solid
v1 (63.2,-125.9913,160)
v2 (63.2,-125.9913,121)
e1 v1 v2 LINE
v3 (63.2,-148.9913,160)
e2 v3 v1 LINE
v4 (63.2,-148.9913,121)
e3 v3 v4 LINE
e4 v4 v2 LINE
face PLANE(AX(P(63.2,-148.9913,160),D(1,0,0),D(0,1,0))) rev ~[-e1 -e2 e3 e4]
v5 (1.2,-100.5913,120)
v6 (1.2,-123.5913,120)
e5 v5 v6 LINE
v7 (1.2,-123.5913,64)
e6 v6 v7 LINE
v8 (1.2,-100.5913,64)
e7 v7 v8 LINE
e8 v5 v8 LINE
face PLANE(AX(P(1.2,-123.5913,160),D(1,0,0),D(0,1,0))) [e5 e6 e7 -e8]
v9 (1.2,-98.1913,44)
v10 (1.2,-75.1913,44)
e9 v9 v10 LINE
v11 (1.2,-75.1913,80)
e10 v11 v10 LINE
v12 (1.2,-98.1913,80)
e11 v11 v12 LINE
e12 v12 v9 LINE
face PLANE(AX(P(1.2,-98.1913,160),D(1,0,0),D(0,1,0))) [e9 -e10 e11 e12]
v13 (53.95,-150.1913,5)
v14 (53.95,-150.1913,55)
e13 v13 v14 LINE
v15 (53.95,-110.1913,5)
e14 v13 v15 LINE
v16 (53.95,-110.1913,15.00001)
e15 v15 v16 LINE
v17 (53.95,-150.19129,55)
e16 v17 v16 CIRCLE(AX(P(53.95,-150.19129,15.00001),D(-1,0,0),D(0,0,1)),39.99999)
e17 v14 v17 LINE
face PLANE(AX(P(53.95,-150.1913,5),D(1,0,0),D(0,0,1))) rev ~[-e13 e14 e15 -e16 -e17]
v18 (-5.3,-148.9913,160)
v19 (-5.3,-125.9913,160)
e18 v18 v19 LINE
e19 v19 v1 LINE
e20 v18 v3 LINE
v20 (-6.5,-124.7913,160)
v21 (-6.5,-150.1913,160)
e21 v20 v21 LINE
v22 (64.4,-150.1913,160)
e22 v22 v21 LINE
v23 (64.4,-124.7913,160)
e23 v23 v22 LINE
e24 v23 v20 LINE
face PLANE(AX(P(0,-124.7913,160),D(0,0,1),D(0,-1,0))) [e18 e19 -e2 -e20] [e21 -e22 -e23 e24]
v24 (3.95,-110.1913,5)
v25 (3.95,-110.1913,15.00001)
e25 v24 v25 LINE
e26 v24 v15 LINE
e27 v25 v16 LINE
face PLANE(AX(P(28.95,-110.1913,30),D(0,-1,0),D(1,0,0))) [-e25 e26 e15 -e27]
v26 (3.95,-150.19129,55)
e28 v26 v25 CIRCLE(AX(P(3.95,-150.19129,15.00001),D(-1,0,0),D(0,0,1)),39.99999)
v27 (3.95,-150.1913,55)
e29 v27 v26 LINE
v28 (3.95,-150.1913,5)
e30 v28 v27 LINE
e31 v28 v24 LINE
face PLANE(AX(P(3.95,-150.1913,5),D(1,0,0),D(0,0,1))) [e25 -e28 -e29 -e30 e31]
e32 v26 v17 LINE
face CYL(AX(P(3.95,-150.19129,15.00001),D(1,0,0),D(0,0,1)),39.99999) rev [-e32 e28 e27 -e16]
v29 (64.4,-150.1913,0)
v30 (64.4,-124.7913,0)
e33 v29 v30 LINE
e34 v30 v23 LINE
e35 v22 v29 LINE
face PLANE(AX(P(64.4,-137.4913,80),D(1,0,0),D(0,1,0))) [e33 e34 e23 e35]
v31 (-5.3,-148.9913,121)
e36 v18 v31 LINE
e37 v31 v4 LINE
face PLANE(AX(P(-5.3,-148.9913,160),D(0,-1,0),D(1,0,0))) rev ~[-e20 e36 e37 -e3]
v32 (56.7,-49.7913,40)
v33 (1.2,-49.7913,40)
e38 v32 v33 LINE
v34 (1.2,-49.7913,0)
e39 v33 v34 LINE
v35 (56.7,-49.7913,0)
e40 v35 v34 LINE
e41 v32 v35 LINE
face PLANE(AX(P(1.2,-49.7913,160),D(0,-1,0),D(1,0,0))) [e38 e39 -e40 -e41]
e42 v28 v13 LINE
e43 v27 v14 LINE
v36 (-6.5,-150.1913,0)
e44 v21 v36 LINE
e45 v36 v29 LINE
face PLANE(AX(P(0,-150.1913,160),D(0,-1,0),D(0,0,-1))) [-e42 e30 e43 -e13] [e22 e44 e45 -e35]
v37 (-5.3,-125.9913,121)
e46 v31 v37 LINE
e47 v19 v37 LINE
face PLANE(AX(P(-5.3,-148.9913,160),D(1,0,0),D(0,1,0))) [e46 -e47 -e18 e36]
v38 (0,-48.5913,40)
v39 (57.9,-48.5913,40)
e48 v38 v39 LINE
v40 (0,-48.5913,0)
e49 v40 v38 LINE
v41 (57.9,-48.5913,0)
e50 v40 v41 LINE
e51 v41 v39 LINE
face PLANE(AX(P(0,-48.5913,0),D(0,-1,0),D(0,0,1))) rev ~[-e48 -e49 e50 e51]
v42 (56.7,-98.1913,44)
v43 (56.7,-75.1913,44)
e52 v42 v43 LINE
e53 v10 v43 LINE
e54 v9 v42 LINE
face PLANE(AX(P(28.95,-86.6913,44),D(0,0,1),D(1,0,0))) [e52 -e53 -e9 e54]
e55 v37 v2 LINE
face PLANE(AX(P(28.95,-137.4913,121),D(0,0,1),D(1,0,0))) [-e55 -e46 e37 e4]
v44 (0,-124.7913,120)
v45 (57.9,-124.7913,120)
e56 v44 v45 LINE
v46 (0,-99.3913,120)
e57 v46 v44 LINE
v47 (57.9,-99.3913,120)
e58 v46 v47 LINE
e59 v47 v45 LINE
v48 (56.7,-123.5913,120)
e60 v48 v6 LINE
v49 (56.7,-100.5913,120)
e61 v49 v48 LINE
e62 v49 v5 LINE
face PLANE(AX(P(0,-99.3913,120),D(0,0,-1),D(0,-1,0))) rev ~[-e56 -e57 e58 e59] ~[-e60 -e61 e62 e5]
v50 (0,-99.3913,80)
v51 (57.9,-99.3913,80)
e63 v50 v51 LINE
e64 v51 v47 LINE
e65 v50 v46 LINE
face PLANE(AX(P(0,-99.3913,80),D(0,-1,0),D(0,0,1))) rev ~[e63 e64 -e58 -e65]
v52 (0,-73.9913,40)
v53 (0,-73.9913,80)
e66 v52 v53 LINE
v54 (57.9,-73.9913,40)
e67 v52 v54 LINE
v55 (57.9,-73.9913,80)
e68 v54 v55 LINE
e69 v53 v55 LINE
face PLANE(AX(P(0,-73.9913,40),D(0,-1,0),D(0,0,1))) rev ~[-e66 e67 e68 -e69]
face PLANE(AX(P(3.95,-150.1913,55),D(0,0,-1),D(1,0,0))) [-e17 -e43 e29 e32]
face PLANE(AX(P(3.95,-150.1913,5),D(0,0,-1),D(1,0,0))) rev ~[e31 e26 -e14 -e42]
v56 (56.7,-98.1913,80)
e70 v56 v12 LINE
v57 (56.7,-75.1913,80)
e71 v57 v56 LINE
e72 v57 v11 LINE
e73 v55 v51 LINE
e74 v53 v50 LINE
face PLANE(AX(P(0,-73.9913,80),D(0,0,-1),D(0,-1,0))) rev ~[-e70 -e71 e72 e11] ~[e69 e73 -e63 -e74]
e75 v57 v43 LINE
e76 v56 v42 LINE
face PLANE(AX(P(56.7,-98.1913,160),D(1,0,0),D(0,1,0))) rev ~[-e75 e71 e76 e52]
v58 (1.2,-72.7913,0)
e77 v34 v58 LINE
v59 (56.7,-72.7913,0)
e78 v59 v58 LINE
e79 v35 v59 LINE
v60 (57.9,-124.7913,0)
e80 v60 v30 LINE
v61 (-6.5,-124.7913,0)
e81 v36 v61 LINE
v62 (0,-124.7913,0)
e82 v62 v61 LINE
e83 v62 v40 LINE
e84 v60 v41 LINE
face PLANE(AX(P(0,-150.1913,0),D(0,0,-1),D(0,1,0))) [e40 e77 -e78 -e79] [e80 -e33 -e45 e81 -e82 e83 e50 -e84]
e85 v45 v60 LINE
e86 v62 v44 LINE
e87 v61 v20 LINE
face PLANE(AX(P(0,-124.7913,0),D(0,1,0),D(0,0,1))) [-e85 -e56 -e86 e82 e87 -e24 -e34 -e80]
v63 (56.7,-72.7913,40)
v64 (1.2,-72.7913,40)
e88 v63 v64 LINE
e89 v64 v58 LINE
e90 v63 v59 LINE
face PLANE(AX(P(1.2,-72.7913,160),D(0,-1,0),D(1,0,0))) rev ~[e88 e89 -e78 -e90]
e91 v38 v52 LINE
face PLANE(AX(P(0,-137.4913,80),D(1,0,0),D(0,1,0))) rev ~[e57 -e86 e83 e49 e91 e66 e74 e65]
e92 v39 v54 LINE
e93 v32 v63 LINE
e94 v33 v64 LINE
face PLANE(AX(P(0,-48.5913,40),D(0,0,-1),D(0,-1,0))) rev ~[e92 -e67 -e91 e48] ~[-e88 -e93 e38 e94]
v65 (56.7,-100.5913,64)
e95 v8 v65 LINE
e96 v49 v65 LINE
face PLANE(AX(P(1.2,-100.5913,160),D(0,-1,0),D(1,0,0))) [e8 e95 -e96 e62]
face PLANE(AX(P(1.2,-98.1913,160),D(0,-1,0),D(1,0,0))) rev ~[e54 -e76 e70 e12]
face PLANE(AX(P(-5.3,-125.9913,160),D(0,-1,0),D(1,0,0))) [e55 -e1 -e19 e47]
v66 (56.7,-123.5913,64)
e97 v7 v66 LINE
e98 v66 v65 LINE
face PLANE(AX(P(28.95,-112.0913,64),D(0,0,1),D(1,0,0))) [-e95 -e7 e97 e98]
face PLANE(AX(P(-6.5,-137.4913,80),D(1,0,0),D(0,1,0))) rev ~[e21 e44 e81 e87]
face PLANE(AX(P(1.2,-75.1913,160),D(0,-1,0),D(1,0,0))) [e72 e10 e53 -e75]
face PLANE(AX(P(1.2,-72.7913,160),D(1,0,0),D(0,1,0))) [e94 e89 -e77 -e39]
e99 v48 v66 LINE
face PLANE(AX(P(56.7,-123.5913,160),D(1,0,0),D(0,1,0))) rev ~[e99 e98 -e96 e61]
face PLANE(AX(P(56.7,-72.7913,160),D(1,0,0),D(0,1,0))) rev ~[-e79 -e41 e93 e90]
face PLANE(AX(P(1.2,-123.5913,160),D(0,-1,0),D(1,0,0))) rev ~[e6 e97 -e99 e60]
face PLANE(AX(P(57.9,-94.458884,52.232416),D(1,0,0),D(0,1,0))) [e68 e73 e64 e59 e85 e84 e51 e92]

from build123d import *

# Parameters (mm, degrees)
F1_DEPTH      = 57.9
F2_DEPTH      = 64.4
F2_DEPTH_BACK = 6.5
F3_W          = 55.5
F3_H          = 23
F4_DEPTH      = 207
F5_DEPTH      = 116
F6_DEPTH      = 96
F3_W_2        = 68.5
F7_DEPTH      = 39
F8_W          = 50
F8_H          = 50
F9_DEPTH      = 40
F10_R         = 39.99999


# Not quite as in the source:
# - a fillet or chamfer is up to 0.001 mm smaller than in the source, because OpenCascade refuses the exact size


with BuildPart() as f1:
    # F0 (on Right) → F1 (new body)
    with BuildSketch(Plane.YZ):
        Polygon((-124.7912996866, 120), (-124.7912996866, 0), (-48.5912996866, 0), (-48.5912996866, 40), (-73.9912996866, 40), (-73.9912996866, 80), (-99.3912996866, 80), (-99.3912996866, 120), align=None)
    extrude(amount=F1_DEPTH)

    # F0 (on Right) → F2 (join, two sides)
    with BuildSketch(Plane.YZ) as f2_sk:
        Polygon((-150.1912996866, 160), (-150.1912996866, 0), (-124.7912996866, 0), (-124.7912996866, 120), (-124.7912996866, 160), align=None)
    extrude(amount=F2_DEPTH)
    extrude(f2_sk.sketch, amount=-F2_DEPTH_BACK)

    # F3 (on face) → F4 (cut)
    with BuildSketch(Plane.XY.offset(160)):
        with Locations((28.95, -61.2912996866)):
            Rectangle(F3_W, F3_H)
    extrude(amount=-F4_DEPTH, mode=Mode.SUBTRACT)

    # F3 (on face) → F5 (cut, through all)
    with BuildSketch(Plane.XY.offset(160)):
        with Locations((28.95, -86.6912996866)):
            Rectangle(F3_W, F3_H)
    extrude(amount=-F5_DEPTH, mode=Mode.SUBTRACT)

    # F3 (on face) → F6 (cut, through all)
    with BuildSketch(Plane.XY.offset(160)):
        with Locations((28.95, -112.0912996866)):
            Rectangle(F3_W, F3_H)
    extrude(amount=-F6_DEPTH, mode=Mode.SUBTRACT)

    # F3 (on face) → F7 (cut)
    with BuildSketch(Plane.XY.offset(160)):
        with Locations((28.95, -137.4912996866)):
            Rectangle(F3_W_2, F3_H)
    extrude(amount=-F7_DEPTH, mode=Mode.SUBTRACT)

    # F8 (on face) → F9 (cut)
    with BuildSketch(Plane.XZ.offset(150.1912996866)):
        with Locations((28.95, 30)):
            Rectangle(F8_W, F8_H)
    extrude(amount=-F9_DEPTH, mode=Mode.SUBTRACT)

    # F10 (radius 40 in the source; OpenCascade refuses exactly that, so slightly less here)
    f10_edges = [f1.edges().sort_by_distance(p)[0] for p in [
        (28.95, -110.1913, 55),
    ]]
    fillet(f10_edges, radius=F10_R)


solid = f1.part
